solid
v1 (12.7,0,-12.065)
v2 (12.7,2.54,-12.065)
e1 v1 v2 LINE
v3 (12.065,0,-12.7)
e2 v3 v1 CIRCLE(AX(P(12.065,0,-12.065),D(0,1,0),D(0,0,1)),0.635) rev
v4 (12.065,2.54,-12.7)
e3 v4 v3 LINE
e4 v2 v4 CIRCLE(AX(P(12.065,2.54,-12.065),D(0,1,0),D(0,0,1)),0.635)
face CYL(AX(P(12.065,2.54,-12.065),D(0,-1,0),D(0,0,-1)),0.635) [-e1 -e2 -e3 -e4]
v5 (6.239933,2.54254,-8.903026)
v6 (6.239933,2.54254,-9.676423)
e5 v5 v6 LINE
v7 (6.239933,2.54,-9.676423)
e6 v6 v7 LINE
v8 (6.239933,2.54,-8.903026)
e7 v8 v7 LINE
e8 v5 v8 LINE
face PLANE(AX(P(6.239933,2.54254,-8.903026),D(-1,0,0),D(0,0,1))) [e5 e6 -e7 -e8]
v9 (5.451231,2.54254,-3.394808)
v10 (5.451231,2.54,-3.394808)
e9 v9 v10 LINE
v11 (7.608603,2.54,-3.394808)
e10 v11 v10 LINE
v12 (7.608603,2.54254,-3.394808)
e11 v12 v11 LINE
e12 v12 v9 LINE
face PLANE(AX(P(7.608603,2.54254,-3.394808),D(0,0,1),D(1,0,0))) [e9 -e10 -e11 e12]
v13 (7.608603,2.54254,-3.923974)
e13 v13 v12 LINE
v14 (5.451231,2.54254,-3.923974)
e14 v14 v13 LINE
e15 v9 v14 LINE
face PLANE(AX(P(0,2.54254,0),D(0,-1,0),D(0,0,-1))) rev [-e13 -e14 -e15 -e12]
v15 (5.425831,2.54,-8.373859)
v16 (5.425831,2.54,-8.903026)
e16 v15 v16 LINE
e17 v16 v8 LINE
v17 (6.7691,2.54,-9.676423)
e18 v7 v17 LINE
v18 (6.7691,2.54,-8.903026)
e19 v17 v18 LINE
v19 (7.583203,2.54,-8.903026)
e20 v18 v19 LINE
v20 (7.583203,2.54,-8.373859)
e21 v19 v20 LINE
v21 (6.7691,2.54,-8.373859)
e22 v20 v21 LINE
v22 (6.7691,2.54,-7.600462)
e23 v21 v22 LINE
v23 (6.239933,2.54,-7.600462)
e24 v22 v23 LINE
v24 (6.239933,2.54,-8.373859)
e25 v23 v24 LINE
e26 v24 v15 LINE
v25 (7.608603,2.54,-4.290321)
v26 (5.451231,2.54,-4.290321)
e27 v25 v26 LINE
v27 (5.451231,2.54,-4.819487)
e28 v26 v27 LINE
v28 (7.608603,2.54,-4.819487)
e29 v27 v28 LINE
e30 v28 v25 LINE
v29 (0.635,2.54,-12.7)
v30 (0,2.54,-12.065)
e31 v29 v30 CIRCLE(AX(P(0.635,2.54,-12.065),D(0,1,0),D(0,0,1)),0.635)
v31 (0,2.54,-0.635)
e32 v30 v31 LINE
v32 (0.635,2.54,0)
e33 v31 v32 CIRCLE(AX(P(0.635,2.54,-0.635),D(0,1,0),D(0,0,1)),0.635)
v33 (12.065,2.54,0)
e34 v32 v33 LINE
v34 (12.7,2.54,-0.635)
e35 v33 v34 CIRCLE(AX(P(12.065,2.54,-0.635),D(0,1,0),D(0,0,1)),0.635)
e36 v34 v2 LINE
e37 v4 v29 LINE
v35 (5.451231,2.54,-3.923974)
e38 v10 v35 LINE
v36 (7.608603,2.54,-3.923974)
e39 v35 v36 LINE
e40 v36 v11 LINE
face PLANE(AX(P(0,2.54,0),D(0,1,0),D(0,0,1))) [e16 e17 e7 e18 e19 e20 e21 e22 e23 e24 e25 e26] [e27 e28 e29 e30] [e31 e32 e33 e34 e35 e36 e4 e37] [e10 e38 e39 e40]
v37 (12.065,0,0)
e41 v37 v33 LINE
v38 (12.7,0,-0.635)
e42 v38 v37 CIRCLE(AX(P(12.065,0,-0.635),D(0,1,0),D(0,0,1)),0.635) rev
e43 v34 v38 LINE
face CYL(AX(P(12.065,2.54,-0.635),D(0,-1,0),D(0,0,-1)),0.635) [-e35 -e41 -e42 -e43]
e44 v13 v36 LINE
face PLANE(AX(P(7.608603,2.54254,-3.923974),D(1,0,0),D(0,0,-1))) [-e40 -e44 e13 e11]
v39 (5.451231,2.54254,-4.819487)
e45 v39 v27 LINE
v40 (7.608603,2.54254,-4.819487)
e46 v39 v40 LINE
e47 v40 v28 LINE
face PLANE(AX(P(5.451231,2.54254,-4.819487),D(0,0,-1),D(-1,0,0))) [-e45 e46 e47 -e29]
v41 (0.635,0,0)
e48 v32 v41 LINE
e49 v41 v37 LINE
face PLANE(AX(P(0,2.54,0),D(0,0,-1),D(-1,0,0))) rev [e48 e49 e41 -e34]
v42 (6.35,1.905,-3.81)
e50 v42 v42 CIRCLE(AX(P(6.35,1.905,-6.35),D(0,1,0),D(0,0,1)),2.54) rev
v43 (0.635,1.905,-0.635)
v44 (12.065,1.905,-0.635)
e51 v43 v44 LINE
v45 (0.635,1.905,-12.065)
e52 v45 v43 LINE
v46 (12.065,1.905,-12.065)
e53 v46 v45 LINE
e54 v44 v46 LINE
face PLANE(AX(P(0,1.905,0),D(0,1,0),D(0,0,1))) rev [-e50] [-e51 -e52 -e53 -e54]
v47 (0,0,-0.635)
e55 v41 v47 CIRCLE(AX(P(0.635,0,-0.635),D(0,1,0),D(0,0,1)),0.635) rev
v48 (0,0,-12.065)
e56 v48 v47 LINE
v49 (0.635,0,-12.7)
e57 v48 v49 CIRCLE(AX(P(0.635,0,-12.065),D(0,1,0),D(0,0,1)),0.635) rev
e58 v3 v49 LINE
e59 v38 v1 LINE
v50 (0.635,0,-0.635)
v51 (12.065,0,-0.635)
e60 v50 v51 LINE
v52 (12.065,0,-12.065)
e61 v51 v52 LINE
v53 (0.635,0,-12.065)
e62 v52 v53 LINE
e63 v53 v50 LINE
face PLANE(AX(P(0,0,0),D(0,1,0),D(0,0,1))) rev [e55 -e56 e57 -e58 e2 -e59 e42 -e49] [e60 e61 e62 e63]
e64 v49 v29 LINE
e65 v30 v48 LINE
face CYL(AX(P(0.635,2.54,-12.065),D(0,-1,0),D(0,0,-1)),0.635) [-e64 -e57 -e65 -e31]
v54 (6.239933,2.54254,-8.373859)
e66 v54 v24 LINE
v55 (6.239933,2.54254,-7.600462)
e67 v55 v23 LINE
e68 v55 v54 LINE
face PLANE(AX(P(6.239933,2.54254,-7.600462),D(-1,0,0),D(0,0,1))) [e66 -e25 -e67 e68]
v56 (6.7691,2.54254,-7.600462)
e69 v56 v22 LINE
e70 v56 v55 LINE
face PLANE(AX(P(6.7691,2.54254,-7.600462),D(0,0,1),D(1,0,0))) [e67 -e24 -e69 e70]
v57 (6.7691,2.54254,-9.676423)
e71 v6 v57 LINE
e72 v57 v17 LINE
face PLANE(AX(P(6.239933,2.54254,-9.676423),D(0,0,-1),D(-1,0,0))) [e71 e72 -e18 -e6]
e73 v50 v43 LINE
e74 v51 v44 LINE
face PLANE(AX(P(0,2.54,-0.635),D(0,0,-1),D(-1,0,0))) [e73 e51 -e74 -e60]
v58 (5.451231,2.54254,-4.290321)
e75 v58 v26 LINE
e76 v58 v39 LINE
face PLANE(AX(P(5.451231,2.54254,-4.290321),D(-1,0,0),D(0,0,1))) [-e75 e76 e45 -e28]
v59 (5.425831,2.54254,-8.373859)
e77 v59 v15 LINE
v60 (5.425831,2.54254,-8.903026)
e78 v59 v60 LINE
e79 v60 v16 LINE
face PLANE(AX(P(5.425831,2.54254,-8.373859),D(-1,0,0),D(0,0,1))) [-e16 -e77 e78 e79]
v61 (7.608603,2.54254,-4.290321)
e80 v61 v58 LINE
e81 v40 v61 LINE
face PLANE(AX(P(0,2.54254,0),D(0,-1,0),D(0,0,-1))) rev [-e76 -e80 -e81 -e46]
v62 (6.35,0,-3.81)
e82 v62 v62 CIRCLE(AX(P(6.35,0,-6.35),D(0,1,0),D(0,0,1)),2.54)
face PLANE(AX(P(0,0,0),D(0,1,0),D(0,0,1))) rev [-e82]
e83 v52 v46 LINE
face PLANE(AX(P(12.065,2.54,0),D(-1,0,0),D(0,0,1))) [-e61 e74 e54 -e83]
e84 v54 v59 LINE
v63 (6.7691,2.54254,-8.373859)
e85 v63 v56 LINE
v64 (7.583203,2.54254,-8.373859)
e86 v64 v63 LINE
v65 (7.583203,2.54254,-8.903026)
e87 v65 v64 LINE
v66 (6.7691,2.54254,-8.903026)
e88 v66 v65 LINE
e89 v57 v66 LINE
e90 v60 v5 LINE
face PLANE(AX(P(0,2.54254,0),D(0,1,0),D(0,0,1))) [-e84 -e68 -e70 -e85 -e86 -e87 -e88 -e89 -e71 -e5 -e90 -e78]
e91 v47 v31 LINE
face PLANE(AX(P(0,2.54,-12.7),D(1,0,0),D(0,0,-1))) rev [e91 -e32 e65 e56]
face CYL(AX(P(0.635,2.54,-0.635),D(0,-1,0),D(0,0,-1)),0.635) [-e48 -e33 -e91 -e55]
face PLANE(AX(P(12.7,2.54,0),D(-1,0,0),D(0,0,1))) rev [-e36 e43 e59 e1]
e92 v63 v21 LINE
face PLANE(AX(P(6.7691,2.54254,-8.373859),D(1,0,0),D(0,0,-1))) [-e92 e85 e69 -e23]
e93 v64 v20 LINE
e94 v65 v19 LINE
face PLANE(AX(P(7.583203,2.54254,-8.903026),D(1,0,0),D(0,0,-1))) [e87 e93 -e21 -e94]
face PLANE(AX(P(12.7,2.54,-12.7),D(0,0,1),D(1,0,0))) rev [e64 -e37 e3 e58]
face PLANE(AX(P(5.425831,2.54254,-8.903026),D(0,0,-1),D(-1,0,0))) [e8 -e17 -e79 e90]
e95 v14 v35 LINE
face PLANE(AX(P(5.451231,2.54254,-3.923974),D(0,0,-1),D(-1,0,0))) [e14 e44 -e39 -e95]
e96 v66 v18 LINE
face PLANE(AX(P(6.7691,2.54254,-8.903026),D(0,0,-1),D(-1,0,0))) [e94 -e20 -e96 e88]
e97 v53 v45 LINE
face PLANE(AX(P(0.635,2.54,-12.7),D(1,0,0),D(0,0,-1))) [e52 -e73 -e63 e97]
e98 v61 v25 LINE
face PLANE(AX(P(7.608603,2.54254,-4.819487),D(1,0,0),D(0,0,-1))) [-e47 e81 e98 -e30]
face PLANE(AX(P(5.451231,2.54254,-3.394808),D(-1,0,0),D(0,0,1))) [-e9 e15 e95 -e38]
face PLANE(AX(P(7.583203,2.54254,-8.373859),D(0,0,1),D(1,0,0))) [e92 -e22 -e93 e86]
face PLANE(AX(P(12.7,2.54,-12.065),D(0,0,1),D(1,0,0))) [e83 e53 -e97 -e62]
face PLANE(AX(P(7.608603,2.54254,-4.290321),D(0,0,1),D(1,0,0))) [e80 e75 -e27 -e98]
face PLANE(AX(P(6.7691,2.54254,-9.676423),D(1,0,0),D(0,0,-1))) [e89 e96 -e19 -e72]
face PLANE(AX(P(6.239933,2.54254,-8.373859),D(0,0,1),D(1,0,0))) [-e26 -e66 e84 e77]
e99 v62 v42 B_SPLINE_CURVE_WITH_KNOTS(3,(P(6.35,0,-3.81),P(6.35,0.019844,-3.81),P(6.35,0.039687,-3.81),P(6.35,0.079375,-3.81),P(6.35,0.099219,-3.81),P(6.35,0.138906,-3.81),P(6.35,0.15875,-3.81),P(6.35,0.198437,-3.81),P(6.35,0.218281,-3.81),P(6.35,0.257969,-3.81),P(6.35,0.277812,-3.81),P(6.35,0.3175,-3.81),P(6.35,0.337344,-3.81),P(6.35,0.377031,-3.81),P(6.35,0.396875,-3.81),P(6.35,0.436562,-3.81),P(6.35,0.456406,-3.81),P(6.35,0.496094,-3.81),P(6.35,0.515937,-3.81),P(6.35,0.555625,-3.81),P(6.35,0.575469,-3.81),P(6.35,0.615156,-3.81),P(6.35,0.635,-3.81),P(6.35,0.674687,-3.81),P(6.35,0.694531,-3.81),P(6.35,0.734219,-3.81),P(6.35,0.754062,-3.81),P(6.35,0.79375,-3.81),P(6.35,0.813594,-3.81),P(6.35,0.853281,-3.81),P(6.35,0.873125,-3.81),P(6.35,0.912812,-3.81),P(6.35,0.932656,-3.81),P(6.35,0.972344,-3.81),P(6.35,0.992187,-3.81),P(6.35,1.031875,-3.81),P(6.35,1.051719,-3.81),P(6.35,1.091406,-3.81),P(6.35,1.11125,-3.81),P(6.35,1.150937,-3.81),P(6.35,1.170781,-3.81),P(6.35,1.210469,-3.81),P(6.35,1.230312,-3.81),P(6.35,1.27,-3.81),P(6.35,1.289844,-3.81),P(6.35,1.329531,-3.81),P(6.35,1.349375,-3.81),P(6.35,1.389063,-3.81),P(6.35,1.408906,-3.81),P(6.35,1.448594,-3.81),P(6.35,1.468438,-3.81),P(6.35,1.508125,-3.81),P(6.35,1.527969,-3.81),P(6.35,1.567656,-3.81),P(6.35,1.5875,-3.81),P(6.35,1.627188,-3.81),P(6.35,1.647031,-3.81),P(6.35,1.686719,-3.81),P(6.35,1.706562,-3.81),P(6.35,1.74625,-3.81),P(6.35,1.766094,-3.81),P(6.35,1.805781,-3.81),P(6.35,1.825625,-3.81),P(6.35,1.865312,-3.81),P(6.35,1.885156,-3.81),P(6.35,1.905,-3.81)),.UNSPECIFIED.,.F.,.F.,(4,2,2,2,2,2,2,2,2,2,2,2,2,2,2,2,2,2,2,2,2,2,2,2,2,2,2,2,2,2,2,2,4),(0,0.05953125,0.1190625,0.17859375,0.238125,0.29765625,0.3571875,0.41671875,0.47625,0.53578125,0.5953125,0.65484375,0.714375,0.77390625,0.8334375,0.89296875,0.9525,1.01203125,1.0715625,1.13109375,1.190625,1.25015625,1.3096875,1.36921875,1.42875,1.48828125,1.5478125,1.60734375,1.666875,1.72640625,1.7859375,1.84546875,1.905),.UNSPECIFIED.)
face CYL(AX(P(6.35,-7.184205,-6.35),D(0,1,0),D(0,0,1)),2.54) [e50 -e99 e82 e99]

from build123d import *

# Parameters (mm, degrees)
SKETCH1_W           = 12.7
SKETCH1_H           = 12.7
BOSS_EXTRUDE1_DEPTH = 2.54
FILLET1_R           = 0.635
SHELL1_START        = 0.635
SHELL1_OUTLINE_W    = 1.905
SHELL1_OUTLINE_H    = 11.43
SHELL1_DEPTH        = 11.43
SKETCH2_R           = 2.54
BOSS_EXTRUDE2_DEPTH = 1.905
SKETCH3_W           = 2.157371795
SKETCH3_H           = 0.529166666
SKETCH3_H_2         = 0.529166667
BOSS_EXTRUDE3_DEPTH = 0.00254


# Read off the part's stored shape, not the designer's step: Shell1
with BuildPart() as part:
    # Sketch1 → Boss-Extrude1 (new body)
    with BuildSketch(Plane(origin=(0, 0, 0), x_dir=(1, 0, 0), z_dir=(0, 1, 0))):
        with Locations((6.35, 6.35)):
            Rectangle(SKETCH1_W, SKETCH1_H)
    extrude(amount=BOSS_EXTRUDE1_DEPTH)

    # Fillet1
    fillet1_edges = [part.edges().sort_by_distance(p)[0] for p in [
        (0, 1.27, -12.7),
        (12.7, 1.27, -12.7),
        (12.7, 1.27, 0),
        (0, 1.27, 0),
    ]]
    fillet(fillet1_edges, radius=FILLET1_R)

    # Shell1 outline → Shell1 (cut)
    with BuildSketch(Plane.YZ.offset(SHELL1_START)):
        with Locations((0.9525, -6.35)):
            Rectangle(SHELL1_OUTLINE_W, SHELL1_OUTLINE_H)
    extrude(amount=SHELL1_DEPTH, mode=Mode.SUBTRACT)

    # Sketch2 → Boss-Extrude2 (add)
    with BuildSketch(Plane(origin=(0, 1.905, 0), x_dir=(-1, 0, 0), z_dir=(0, -1, 0))):
        with Locations(Location((-6.35, 6.35, 0), (0, 0, 270))):
            Circle(SKETCH2_R)
    extrude(amount=BOSS_EXTRUDE2_DEPTH)

    # Sketch3 → Boss-Extrude3 (add)
    with BuildSketch(Plane(origin=(0, 2.54, 0), x_dir=(1, 0, 0), z_dir=(0, 1, 0))):
        Polygon((6.239933333, 8.903025641), (6.239933333, 9.676423077), (6.7691, 9.676423077), (6.7691, 8.903025641), (7.583202564, 8.903025641), (7.583202564, 8.373858974), (6.7691, 8.373858974), (6.7691, 7.600461538), (6.239933333, 7.600461538), (6.239933333, 8.373858974), (5.425830769, 8.373858974), (5.425830769, 8.903025641), align=None)
        with Locations((6.529916667, 4.554903846)):
            Rectangle(SKETCH3_W, SKETCH3_H)
        with Locations((6.529916667, 3.659391026)):
            Rectangle(SKETCH3_W, SKETCH3_H_2)
    extrude(amount=BOSS_EXTRUDE3_DEPTH)


solid = part.part
